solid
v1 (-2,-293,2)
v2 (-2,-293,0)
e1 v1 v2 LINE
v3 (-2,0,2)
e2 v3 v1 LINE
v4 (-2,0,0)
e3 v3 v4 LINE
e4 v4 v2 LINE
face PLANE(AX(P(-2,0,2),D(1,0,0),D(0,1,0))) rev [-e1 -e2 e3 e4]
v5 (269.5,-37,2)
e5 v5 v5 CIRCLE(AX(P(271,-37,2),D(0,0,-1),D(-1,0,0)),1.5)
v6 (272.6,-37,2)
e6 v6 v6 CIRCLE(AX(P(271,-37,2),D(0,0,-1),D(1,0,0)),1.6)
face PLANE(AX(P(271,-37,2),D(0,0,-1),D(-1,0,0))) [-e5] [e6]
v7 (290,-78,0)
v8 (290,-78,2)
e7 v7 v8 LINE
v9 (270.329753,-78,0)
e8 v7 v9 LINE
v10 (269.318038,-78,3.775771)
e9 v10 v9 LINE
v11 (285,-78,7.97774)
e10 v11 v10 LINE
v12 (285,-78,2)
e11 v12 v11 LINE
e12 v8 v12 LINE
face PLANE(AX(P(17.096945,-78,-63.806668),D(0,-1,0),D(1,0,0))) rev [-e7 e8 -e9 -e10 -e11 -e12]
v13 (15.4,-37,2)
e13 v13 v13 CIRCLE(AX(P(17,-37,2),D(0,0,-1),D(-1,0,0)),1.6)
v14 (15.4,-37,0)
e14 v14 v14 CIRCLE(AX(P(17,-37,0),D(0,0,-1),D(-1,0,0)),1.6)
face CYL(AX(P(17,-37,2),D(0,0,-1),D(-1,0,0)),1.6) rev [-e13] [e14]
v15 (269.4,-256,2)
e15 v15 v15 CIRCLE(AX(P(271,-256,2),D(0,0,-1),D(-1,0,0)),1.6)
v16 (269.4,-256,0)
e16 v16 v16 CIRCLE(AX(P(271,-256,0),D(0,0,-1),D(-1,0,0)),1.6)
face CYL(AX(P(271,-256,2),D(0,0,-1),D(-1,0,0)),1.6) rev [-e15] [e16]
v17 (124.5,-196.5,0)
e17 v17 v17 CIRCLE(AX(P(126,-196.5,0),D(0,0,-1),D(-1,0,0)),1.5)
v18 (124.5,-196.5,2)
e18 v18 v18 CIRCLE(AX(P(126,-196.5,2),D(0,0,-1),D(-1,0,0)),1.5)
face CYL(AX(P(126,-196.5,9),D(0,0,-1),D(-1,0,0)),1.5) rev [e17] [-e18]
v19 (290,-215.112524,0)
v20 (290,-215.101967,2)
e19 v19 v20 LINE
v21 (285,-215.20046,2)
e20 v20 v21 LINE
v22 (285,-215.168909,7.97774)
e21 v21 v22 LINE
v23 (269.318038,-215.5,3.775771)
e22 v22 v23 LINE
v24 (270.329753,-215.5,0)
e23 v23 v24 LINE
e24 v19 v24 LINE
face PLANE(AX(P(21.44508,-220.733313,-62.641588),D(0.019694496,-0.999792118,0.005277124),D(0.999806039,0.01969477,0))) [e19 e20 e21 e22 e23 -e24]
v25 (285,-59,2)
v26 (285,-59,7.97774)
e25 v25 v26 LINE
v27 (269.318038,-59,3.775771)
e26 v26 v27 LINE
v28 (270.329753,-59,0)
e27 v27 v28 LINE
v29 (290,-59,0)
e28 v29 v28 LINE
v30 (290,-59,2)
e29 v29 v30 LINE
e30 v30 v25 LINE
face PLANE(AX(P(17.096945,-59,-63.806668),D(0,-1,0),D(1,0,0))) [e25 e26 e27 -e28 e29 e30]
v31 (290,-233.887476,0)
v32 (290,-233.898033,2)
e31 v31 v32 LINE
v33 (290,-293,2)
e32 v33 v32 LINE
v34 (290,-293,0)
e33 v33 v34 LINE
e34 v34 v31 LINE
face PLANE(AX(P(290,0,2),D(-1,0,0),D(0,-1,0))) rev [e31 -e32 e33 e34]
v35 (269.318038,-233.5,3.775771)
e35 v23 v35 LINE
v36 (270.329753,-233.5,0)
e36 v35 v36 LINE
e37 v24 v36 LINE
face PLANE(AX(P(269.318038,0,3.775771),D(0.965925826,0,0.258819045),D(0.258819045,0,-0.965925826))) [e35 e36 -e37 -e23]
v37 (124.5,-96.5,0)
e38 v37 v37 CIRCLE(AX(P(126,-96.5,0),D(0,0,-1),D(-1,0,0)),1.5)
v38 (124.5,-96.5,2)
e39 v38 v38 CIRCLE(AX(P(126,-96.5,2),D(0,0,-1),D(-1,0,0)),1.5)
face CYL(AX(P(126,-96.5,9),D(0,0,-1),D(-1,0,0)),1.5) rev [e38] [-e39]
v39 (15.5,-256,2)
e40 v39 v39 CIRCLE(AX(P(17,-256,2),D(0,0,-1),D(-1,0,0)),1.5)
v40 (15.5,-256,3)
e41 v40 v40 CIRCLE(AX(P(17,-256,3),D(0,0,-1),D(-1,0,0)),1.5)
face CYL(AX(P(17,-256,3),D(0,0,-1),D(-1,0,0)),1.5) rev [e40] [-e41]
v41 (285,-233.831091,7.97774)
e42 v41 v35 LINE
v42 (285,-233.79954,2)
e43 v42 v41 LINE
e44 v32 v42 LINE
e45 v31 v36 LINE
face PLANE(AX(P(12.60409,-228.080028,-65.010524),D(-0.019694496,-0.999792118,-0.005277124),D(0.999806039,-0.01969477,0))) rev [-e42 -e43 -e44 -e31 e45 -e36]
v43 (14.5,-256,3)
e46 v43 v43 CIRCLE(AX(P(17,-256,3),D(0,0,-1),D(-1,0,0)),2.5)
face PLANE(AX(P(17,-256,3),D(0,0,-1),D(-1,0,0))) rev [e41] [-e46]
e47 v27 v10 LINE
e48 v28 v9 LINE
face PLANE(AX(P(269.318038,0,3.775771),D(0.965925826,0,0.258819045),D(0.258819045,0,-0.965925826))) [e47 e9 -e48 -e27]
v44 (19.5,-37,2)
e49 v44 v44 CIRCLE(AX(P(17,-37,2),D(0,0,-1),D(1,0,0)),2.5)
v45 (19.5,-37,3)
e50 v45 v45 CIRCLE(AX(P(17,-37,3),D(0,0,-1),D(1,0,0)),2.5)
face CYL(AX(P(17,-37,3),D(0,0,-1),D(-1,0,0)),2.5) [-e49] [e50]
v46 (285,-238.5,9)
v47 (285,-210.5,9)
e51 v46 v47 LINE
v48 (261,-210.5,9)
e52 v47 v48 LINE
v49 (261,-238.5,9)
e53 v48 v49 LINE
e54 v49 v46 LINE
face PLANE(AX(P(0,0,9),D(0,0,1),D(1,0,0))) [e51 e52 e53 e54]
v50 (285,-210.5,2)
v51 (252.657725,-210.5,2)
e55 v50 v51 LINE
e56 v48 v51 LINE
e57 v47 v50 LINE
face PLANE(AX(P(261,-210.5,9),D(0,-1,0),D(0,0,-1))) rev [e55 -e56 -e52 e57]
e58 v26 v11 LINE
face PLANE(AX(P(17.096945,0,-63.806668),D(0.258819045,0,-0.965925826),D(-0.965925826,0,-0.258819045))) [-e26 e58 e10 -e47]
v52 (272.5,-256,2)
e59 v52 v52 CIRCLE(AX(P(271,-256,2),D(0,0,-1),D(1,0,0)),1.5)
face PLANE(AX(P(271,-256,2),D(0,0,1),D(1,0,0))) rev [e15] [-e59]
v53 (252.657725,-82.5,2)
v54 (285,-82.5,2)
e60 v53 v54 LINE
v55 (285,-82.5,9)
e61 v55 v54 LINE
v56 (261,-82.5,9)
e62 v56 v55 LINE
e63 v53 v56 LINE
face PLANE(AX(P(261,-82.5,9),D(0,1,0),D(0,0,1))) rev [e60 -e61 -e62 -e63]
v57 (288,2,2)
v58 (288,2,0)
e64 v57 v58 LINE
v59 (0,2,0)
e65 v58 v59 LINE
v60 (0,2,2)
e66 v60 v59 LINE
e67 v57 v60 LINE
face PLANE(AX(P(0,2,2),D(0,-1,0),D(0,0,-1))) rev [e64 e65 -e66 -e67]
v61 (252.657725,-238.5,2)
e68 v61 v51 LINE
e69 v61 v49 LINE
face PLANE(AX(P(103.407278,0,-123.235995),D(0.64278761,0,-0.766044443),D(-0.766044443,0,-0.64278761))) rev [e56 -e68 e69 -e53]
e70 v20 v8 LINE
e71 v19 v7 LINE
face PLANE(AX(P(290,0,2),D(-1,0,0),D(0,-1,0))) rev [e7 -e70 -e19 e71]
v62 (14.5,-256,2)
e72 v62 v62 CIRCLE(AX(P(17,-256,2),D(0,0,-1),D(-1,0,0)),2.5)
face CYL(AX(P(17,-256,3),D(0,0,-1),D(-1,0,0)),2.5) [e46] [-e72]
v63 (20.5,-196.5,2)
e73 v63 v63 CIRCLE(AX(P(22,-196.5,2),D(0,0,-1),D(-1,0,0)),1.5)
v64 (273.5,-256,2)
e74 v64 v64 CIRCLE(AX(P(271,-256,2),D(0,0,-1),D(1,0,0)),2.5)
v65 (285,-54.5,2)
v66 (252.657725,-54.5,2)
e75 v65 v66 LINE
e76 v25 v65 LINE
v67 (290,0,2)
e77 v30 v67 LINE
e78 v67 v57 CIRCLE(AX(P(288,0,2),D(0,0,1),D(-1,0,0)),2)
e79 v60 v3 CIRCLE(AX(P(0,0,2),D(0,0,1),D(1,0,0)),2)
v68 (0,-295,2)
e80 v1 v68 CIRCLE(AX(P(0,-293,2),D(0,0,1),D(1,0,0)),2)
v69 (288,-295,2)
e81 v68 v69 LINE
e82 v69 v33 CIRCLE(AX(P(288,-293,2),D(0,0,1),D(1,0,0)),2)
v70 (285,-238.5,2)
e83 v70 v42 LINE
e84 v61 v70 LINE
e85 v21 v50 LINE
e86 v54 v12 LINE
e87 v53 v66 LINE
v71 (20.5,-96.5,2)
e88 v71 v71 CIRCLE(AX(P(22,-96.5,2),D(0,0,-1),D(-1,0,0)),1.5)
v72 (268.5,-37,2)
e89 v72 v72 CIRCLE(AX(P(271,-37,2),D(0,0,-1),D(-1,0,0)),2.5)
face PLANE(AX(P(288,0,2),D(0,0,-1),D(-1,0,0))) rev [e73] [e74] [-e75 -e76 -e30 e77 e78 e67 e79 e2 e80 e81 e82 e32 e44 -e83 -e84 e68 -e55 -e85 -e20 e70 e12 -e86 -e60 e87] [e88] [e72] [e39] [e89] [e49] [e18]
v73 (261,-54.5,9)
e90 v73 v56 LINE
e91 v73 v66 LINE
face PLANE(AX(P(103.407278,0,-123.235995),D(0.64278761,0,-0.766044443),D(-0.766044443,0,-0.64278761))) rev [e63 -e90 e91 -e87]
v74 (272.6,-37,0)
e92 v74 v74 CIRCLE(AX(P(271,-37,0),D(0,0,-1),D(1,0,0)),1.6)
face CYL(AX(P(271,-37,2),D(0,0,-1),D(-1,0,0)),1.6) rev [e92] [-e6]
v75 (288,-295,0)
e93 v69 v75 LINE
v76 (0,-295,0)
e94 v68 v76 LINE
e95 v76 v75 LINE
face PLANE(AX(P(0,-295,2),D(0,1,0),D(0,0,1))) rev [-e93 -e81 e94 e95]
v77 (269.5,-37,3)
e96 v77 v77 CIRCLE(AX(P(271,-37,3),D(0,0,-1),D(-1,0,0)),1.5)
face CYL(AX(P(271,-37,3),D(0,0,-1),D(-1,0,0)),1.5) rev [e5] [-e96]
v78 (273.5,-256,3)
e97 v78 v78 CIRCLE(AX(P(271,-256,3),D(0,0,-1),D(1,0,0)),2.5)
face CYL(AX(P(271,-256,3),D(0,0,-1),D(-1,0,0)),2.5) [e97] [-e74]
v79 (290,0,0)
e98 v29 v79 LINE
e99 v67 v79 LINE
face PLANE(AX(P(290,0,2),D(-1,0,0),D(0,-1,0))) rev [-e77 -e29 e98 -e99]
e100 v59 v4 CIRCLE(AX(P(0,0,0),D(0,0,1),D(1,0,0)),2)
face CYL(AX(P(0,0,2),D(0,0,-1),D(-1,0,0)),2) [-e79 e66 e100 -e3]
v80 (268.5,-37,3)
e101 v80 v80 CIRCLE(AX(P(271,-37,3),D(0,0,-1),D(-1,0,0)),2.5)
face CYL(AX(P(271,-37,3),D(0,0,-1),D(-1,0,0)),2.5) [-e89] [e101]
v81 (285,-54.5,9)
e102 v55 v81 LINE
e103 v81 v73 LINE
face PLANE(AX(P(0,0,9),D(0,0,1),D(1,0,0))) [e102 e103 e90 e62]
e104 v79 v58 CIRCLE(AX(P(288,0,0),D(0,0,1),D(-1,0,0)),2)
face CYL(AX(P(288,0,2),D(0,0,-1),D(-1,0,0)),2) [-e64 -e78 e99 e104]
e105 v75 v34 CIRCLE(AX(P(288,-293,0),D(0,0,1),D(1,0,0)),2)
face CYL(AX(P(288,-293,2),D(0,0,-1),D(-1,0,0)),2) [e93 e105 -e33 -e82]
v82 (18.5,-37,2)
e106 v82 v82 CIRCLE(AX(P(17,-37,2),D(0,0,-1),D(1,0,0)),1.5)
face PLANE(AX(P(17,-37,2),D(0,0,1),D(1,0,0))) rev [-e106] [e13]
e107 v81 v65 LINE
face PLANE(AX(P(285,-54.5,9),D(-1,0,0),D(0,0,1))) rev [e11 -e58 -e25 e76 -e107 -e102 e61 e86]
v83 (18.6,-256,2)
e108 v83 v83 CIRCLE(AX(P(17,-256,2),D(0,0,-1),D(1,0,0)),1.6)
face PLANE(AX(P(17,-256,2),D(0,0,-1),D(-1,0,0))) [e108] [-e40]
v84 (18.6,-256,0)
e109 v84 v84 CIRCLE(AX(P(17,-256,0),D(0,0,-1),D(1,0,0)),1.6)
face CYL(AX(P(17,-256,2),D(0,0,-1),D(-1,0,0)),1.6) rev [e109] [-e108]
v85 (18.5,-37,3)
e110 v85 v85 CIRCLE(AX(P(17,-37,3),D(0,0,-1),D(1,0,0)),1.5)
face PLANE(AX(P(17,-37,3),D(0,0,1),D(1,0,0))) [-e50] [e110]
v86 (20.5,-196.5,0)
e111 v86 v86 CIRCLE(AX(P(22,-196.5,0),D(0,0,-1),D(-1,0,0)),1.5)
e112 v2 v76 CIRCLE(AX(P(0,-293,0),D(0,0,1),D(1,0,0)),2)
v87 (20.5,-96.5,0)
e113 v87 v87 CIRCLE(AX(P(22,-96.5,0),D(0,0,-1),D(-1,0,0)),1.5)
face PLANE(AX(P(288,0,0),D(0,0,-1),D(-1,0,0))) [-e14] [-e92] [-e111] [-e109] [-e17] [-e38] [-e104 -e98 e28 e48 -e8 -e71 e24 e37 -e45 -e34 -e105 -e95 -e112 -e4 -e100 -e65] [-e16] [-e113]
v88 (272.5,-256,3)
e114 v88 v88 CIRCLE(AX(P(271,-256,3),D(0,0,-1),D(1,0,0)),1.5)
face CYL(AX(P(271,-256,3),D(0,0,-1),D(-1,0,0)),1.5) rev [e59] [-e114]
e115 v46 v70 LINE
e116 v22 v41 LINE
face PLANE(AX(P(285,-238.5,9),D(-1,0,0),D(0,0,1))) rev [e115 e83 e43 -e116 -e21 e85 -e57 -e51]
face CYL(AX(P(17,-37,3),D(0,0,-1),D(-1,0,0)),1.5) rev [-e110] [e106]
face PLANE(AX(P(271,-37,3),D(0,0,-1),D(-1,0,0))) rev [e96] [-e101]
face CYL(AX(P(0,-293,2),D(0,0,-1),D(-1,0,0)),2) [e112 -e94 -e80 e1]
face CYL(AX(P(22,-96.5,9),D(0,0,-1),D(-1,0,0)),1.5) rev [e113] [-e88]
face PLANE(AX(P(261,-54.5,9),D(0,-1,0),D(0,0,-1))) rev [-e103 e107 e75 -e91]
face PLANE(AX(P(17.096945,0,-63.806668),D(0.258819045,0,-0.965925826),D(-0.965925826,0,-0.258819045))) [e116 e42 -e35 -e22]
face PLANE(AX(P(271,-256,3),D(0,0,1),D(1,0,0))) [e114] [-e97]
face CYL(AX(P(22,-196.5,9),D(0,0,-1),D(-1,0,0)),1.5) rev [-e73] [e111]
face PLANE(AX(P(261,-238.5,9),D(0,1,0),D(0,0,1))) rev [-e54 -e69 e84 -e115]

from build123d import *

# Parameters (mm, degrees)
BOSS_EXTRUDE1_DEPTH = 2
SKETCH4_R           = 1.6
CUT_EXTRUDE4_DEPTH  = 414.677410551
SKETCH3_R           = 2.5
SKETCH3_R_2         = 1.5
BOSS_EXTRUDE3_DEPTH = 1
SKETCH5_W           = 24
SKETCH5_H           = 28
BOSS_EXTRUDE2_DEPTH = 7
SKETCH2_W           = 19
SKETCH2_H           = 24.51763809
CUT_EXTRUDE5_DEPTH  = 9
BOSS_EXTRUDE4_REACH = 375.267
SKETCH8_W           = 28
SKETCH8_H           = 24
SKETCH9_R           = 1.5
CUT_EXTRUDE7_DEPTH  = 414.770467772


with BuildPart() as part:
    # Sketch1 → Boss-Extrude1 (new body)
    with BuildSketch(Plane.XY):
        with BuildLine():
            Line((0, 2), (288, 2))
            ThreePointArc((288, 2), (289.414213562, 1.414213562), (290, 0))
            Line((290, 0), (290, -293))
            ThreePointArc((290, -293), (289.414213562, -294.414213562), (288, -295))
            Line((288, -295), (0, -295))
            ThreePointArc((0, -295), (-1.414213562, -294.414213562), (-2, -293))
            Line((-2, -293), (-2, 0))
            ThreePointArc((-2, 0), (-1.414213562, 1.414213562), (0, 2))
        make_face()
    extrude(amount=BOSS_EXTRUDE1_DEPTH)

    # Sketch4 → Cut-Extrude4 (cut, through all)
    with BuildSketch(Plane(origin=(0, 0, 0), x_dir=(-1, 0, 0), z_dir=(0, 0, -1))):
        with Locations((-271, -256)):
            Circle(SKETCH4_R)
        with Locations(Location((-271, -37, 0), (0, 0, 180))):
            Circle(SKETCH4_R)
        with Locations(Location((-17, -256, 0), (0, 0, 180))):
            Circle(SKETCH4_R)
        with Locations((-17, -37)):
            Circle(SKETCH4_R)
    extrude(amount=-CUT_EXTRUDE4_DEPTH, mode=Mode.SUBTRACT)

    # Sketch3 → Boss-Extrude3 (add)
    # profile 1 of 4: a face of its own
    with BuildSketch(Plane(origin=(0, 0, 2), x_dir=(-1, 0, 0), z_dir=(0, 0, -1))):
        with Locations((-271, -37)):
            Circle(SKETCH3_R)
        with Locations((-271, -37)):
            Circle(SKETCH3_R_2, mode=Mode.SUBTRACT)
    # profile 2 of 4: a face of its own
    with BuildSketch(Plane(origin=(0, 0, 2), x_dir=(-1, 0, 0), z_dir=(0, 0, -1))):
        with Locations(Location((-17, -37, 0), (0, 0, 180))):
            Circle(SKETCH3_R)
        with Locations(Location((-17, -37, 0), (0, 0, 180))):
            Circle(SKETCH3_R_2, mode=Mode.SUBTRACT)
    # profile 3 of 4: a face of its own
    with BuildSketch(Plane(origin=(0, 0, 2), x_dir=(-1, 0, 0), z_dir=(0, 0, -1))):
        with Locations((-17, -256)):
            Circle(SKETCH3_R)
        with Locations((-17, -256)):
            Circle(SKETCH3_R_2, mode=Mode.SUBTRACT)
    # profile 4 of 4: a face of its own
    with BuildSketch(Plane(origin=(0, 0, 2), x_dir=(-1, 0, 0), z_dir=(0, 0, -1))):
        with Locations(Location((-271, -256, 0), (0, 0, 180))):
            Circle(SKETCH3_R)
        with Locations(Location((-271, -256, 0), (0, 0, 180))):
            Circle(SKETCH3_R_2, mode=Mode.SUBTRACT)
    extrude(amount=-BOSS_EXTRUDE3_DEPTH)

    # Sketch5 → Boss-Extrude2 (add)
    with BuildSketch(Plane.XY.offset(2)):
        with Locations((273, -68.5)):
            Rectangle(SKETCH5_W, SKETCH5_H)
        with Locations((273, -224.5)):
            Rectangle(SKETCH5_W, SKETCH5_H)
    extrude(amount=BOSS_EXTRUDE2_DEPTH)

    # Sketch2 → Cut-Extrude5 (cut)
    with BuildSketch(Plane(origin=(19.360490202, 0, -72.51763809), x_dir=(0, -1, 0), z_dir=(-0.25881904510252135, 0, 0.9659258262890681))):
        Polygon((234, 285.704276061), (215, 285.704276061), (215.5, 261.186637971), (233.5, 261.186637971), align=None)
        with Locations((68.5, 273.445457016)):
            Rectangle(SKETCH2_W, SKETCH2_H)
    extrude(amount=CUT_EXTRUDE5_DEPTH, mode=Mode.SUBTRACT)

    # Sketch8 → Boss-Extrude4 (add, up to next)
    with BuildSketch(Plane(origin=(103.407277926, 0, -123.235994969), x_dir=(0, -1, 0), z_dir=(-0.6427876096865406, 0, 0.7660444431189771)), mode=Mode.PRIVATE) as boss_extrude4_sk1:
        with Locations((68.5, 193.722688141)):
            Rectangle(SKETCH8_W, SKETCH8_H)
    boss_extrude4_tool1 = extrude(boss_extrude4_sk1.sketch, amount=-BOSS_EXTRUDE4_REACH, mode=Mode.PRIVATE) - part.part
    # Sketch8 → Boss-Extrude4 (add, up to next)
    with BuildSketch(Plane(origin=(103.407277926, 0, -123.235994969), x_dir=(0, -1, 0), z_dir=(-0.6427876096865406, 0, 0.7660444431189771)), mode=Mode.PRIVATE) as boss_extrude4_sk2:
        with Locations((224.5, 193.722688141)):
            Rectangle(SKETCH8_W, SKETCH8_H)
    boss_extrude4_tool2 = extrude(boss_extrude4_sk2.sketch, amount=-BOSS_EXTRUDE4_REACH, mode=Mode.PRIVATE) - part.part
    add(boss_extrude4_tool1.solids().sort_by_distance((251.807467, -68.5, 1.286549))[0])
    add(boss_extrude4_tool2.solids().sort_by_distance((251.807467, -224.5, 1.286549))[0])

    # Sketch9 → Cut-Extrude7 (cut, through all)
    with BuildSketch(Plane(origin=(0, 0, 0), x_dir=(-1, 0, 0), z_dir=(0, 0, -1))):
        with Locations((-126, -196.5)):
            Circle(SKETCH9_R)
        with Locations((-126, -96.5)):
            Circle(SKETCH9_R)
        with Locations((-22, -96.5)):
            Circle(SKETCH9_R)
        with Locations((-22, -196.5)):
            Circle(SKETCH9_R)
    extrude(amount=-CUT_EXTRUDE7_DEPTH, mode=Mode.SUBTRACT)


solid = part.part
